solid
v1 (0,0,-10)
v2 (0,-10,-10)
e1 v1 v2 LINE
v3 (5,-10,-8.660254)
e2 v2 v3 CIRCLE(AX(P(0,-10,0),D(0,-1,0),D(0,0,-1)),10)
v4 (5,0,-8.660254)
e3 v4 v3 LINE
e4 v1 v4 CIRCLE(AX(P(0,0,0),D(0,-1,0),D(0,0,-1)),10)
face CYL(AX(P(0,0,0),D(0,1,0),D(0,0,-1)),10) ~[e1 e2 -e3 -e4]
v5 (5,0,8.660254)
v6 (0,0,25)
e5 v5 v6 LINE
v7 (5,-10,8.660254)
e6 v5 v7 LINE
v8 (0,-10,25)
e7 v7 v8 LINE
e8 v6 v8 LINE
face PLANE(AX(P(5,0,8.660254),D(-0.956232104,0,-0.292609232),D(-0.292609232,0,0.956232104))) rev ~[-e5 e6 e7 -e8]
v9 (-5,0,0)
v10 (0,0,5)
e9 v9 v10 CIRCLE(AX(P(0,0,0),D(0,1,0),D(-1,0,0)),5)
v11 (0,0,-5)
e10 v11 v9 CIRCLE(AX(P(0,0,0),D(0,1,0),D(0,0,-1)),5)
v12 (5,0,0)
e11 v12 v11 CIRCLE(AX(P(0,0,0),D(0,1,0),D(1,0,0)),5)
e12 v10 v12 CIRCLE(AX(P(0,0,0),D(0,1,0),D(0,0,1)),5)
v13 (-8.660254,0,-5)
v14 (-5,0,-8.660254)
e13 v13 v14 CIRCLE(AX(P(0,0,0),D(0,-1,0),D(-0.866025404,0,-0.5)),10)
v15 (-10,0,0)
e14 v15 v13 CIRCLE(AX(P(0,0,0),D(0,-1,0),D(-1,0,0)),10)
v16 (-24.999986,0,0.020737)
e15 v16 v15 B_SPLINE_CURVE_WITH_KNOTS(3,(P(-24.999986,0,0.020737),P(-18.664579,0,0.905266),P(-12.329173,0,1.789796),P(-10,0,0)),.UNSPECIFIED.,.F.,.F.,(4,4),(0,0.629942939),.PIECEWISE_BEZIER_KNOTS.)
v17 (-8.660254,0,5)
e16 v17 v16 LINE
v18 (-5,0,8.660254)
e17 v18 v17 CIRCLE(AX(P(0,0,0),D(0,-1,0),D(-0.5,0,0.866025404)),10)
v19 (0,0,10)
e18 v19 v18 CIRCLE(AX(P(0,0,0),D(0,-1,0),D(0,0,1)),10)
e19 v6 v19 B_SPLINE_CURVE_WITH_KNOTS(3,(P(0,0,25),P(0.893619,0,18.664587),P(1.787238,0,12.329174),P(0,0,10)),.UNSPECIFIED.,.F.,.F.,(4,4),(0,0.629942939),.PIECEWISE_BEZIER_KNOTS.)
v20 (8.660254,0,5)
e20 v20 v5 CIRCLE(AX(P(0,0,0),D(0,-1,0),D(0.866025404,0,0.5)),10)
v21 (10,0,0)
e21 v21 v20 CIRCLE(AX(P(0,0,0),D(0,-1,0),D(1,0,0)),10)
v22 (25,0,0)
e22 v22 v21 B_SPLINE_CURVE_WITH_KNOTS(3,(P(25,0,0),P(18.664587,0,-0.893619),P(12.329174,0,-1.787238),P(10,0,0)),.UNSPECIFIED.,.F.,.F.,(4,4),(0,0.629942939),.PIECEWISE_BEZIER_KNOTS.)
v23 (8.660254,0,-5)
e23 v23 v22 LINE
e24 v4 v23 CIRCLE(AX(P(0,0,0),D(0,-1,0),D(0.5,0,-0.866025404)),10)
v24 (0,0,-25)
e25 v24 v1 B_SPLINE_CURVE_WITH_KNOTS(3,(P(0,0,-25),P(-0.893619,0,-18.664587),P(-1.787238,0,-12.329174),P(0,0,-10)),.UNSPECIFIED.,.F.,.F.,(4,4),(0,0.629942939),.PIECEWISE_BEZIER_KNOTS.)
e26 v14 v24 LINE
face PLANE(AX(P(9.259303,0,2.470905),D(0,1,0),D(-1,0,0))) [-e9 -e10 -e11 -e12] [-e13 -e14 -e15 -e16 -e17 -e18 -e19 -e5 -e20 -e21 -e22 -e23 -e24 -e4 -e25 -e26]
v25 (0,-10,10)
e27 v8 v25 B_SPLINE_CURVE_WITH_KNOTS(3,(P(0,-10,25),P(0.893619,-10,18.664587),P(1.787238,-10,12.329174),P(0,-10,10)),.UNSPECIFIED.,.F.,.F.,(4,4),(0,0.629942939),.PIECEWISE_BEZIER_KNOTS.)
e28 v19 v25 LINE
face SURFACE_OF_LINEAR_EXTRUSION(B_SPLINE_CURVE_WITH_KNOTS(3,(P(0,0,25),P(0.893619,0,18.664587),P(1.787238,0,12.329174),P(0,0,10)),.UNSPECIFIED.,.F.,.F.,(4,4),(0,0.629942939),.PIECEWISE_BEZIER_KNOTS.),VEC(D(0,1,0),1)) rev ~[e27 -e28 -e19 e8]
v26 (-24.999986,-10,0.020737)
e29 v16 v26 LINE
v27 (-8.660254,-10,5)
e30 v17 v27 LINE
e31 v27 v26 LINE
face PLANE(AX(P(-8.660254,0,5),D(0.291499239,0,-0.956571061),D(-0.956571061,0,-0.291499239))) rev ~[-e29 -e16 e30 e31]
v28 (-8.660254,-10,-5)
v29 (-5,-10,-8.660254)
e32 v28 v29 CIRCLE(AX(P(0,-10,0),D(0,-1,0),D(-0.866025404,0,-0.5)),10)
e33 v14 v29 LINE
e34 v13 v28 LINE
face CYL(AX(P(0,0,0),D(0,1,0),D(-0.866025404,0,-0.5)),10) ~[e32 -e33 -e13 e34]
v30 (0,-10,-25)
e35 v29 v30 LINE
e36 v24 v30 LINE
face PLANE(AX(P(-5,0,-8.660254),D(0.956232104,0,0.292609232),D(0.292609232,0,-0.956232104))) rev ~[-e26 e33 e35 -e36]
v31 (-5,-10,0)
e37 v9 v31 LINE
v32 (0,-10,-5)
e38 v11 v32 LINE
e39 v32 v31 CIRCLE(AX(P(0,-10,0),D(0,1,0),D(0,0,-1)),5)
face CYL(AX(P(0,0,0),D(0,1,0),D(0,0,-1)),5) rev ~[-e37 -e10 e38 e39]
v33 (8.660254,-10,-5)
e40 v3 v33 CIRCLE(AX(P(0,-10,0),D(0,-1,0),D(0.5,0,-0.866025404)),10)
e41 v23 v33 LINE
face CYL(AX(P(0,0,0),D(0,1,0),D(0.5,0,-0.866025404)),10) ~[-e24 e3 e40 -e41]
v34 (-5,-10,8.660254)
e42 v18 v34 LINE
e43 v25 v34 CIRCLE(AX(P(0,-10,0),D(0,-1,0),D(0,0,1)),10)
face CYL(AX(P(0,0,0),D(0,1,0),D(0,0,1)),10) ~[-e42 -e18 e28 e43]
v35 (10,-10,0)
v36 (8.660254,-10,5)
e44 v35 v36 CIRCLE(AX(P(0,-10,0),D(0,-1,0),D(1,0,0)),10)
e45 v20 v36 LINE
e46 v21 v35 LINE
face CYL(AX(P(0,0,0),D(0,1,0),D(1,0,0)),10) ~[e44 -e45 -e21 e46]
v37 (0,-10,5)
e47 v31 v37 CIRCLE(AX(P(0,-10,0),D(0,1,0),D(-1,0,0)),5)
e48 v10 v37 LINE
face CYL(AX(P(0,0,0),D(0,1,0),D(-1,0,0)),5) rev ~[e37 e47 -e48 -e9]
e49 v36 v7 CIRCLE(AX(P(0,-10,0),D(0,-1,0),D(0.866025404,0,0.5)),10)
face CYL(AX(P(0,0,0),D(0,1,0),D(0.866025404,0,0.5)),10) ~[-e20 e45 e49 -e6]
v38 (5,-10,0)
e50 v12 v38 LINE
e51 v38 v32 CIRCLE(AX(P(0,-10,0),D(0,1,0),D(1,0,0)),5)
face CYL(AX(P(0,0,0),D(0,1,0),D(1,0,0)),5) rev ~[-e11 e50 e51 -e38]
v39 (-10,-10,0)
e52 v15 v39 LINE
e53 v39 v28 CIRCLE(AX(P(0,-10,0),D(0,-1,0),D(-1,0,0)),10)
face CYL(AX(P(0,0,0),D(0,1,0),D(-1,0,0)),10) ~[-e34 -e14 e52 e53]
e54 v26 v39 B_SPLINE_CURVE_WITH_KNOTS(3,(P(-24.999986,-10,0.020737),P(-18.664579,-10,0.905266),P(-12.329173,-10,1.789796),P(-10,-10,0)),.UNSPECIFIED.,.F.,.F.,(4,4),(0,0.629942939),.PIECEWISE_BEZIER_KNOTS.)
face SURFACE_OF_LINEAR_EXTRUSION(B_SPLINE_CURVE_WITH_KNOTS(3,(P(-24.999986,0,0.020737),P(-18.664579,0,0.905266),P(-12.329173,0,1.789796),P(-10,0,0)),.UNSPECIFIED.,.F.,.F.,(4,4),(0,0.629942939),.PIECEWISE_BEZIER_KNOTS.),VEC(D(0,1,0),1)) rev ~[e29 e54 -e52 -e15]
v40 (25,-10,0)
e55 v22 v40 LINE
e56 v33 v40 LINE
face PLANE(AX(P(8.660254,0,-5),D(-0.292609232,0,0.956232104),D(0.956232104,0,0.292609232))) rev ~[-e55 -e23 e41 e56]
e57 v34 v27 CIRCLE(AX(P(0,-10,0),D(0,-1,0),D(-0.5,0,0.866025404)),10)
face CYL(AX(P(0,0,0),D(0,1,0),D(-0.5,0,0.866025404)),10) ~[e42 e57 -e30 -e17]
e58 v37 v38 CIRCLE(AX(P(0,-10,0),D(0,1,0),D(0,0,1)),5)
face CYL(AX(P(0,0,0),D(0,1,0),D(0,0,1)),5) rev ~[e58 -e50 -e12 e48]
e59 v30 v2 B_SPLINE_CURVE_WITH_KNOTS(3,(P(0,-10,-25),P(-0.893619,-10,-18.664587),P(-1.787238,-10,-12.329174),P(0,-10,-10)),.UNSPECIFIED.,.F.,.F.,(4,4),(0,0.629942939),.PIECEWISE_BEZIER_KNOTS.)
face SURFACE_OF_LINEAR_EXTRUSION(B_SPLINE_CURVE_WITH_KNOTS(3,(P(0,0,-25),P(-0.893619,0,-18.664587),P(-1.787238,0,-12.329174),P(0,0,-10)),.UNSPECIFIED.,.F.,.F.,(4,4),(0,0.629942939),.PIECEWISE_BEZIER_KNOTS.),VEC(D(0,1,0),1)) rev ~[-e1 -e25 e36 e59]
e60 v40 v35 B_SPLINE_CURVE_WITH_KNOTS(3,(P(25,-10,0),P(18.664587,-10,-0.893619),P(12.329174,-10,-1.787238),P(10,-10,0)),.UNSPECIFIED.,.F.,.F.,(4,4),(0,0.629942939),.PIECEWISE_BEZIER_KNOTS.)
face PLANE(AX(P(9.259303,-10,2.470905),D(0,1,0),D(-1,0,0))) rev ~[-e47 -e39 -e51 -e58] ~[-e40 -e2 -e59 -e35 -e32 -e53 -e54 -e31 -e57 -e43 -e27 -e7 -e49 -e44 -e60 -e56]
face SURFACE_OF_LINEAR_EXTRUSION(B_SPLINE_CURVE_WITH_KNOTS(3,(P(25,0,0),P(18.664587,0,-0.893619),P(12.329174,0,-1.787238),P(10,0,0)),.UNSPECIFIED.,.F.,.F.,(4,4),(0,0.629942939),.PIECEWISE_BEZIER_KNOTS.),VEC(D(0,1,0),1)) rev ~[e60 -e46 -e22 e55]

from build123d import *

# Parameters (mm, degrees)
F1_DEPTH = 10


# Not quite as in the source:
# - a feature names something its author has since deleted; it is built from what else it names


with BuildPart() as f1:
    # F0 (on Front) → F1 (new body)
    with BuildSketch(Plane.XZ):
        with BuildLine():
            add(Edge.make_bspline(
                [(10, 0), (8.6317372981, 1.0499048978), (8.645995668, 3.0249524489), (8.6602540378, 5)],
                knots=[0.6299429387, 0.6299429387, 0.6299429387, 0.6299429387, 1, 1, 1, 1], degree=3))
            ThreePointArc((10, 0), (9.6592582629, 2.588190451), (8.6602540378, 5))
        make_face()
        with BuildLine():
            add(Edge.make_bspline(
                [(25, 0), (18.6645871914, -0.8936191818), (12.3291743827, -1.7872383636), (10, 0)],
                knots=[0, 0, 0, 0, 0.6299429387, 0.6299429387, 0.6299429387, 0.6299429387], degree=3))
            ThreePointArc((10, 0), (9.6592582629, -2.588190451), (8.6602540378, -5))
            Line((8.6602540378, -5), (25, 0))
        make_face()
        with BuildLine():
            ThreePointArc((8.6602540378, -5), (9.6592582629, -2.588190451), (10, 0))
            Line((10, 0), (5, 0))
            Line((5, 0), (5, -4.9574967987))
            Line((5, -4.9574967987), (5, -5))
            Line((5, -5), (8.6602540378, -5))
        make_face()
        with BuildLine():
            Line((5, 0), (10, 0))
            add(Edge.make_bspline(
                [(10, 0), (8.6317372981, 1.0499048978), (8.645995668, 3.0249524489), (8.6602540378, 5)],
                knots=[0.6299429387, 0.6299429387, 0.6299429387, 0.6299429387, 1, 1, 1, 1], degree=3))
            Line((8.6602540378, 5), (5, 5))
            Line((5, 5), (5, 0))
        make_face()
        with BuildLine():
            Line((5, 5), (8.6602540378, 5))
            ThreePointArc((8.6602540378, 5), (7.0710678119, 7.0710678119), (5, 8.6602540378))
            Line((5, 8.6602540378), (5, 5))
        make_face()
        with BuildLine():
            ThreePointArc((5, -8.6602540378), (7.0710678119, -7.0710678119), (8.6602540378, -5))
            Line((8.6602540378, -5), (5, -5))
            Line((5, -5), (5, -8.6602540378))
        make_face()
        with BuildLine():
            ThreePointArc((0, 5), (3.5355339059, 3.5355339059), (5, 0))
            Line((5, 0), (5, 5))
            Line((5, 5), (4.9574967987, 5))
            Line((4.9574967987, 5), (0, 5))
        make_face()
        with BuildLine():
            Line((5, -4.9574967987), (5, 0))
            ThreePointArc((5, 0), (3.5355339059, -3.5355339059), (0, -5))
            Line((0, -5), (4.9574967987, -5))
            Line((4.9574967987, -5), (5, -5))
            Line((5, -5), (5, -4.9574967987))
        make_face()
        with BuildLine():
            Line((5, 5), (5, 8.6602540378))
            ThreePointArc((5, 8.6602540378), (2.588190451, 9.6592582629), (0, 10))
            Line((0, 10), (0, 5))
            Line((0, 5), (4.9574967987, 5))
            Line((4.9574967987, 5), (5, 5))
        make_face()
        with BuildLine():
            ThreePointArc((0, 10), (2.588190451, 9.6592582629), (5, 8.6602540378))
            Line((5, 8.6602540378), (0, 25))
            add(Edge.make_bspline(
                [(0, 25), (0.8936191818, 18.6645871914), (1.7872383636, 12.3291743827), (0, 10)],
                knots=[0, 0, 0, 0, 0.6299429387, 0.6299429387, 0.6299429387, 0.6299429387], degree=3))
        make_face()
        with BuildLine():
            add(Edge.make_bspline(
                [(0, -10), (1.0499048978, -8.6317372981), (3.0249524489, -8.645995668), (5, -8.6602540378)],
                knots=[0.6299429387, 0.6299429387, 0.6299429387, 0.6299429387, 1, 1, 1, 1], degree=3))
            Line((5, -8.6602540378), (5, -5))
            Line((5, -5), (4.9574967987, -5))
            Line((4.9574967987, -5), (0, -5))
            Line((0, -5), (0, -10))
        make_face()
        with BuildLine():
            ThreePointArc((0, -10), (2.588190451, -9.6592582629), (5, -8.6602540378))
            add(Edge.make_bspline(
                [(0, -10), (1.0499048978, -8.6317372981), (3.0249524489, -8.645995668), (5, -8.6602540378)],
                knots=[0.6299429387, 0.6299429387, 0.6299429387, 0.6299429387, 1, 1, 1, 1], degree=3))
        make_face()
        with BuildLine():
            Line((-5, 5), (0, 5))
            Line((0, 5), (0, 10))
            add(Edge.make_bspline(
                [(0, 10), (-1.0499048978, 8.6317372981), (-3.0249524489, 8.645995668), (-5, 8.6602540378)],
                knots=[0.6299429387, 0.6299429387, 0.6299429387, 0.6299429387, 1, 1, 1, 1], degree=3))
            Line((-5, 8.6602540378), (-5, 5))
        make_face()
        with BuildLine():
            ThreePointArc((-5, 0), (-3.5355339059, 3.5355339059), (0, 5))
            Line((0, 5), (-5, 5))
            Line((-5, 5), (-5, 0))
        make_face()
        with BuildLine():
            Line((0, -10), (0, -5))
            Line((0, -5), (-5, -5))
            Line((-5, -5), (-5, -8.6602540378))
            ThreePointArc((-5, -8.6602540378), (-2.588190451, -9.6592582629), (0, -10))
        make_face()
        with BuildLine():
            Line((-5, -5), (0, -5))
            ThreePointArc((0, -5), (-3.5355339059, -3.5355339059), (-5, 0))
            Line((-5, 0), (-5, -4.9574967987))
            Line((-5, -4.9574967987), (-5, -5))
        make_face()
        with BuildLine():
            add(Edge.make_bspline(
                [(0, 10), (-1.0499048978, 8.6317372981), (-3.0249524489, 8.645995668), (-5, 8.6602540378)],
                knots=[0.6299429387, 0.6299429387, 0.6299429387, 0.6299429387, 1, 1, 1, 1], degree=3))
            ThreePointArc((0, 10), (-2.588190451, 9.6592582629), (-5, 8.6602540378))
        make_face()
        with BuildLine():
            add(Edge.make_bspline(
                [(0, -25), (-0.8936191818, -18.6645871914), (-1.7872383636, -12.3291743827), (0, -10)],
                knots=[0, 0, 0, 0, 0.6299429387, 0.6299429387, 0.6299429387, 0.6299429387], degree=3))
            ThreePointArc((0, -10), (-2.588190451, -9.6592582629), (-5, -8.6602540378))
            Line((-5, -8.6602540378), (0, -25))
        make_face()
        with BuildLine():
            Line((-5, -4.9574967987), (-5, 0))
            Line((-5, 0), (-10, 0))
            add(Edge.make_bspline(
                [(-10, 0), (-8.6317383367, -1.0514075248), (-8.6459961873, -3.0257037624), (-8.6602540378, -5)],
                knots=[0.6299429387, 0.6299429387, 0.6299429387, 0.6299429387, 1, 1, 1, 1], degree=3))
            Line((-8.6602540378, -5), (-5, -5))
            Line((-5, -5), (-5, -4.9574967987))
        make_face()
        with BuildLine():
            Line((-10, 0), (-5, 0))
            Line((-5, 0), (-5, 5))
            Line((-5, 5), (-8.6602540378, 5))
            ThreePointArc((-8.6602540378, 5), (-9.6592582629, 2.588190451), (-10, 0))
        make_face()
        with BuildLine():
            Line((-8.6602540378, 5), (-5, 5))
            Line((-5, 5), (-5, 8.6602540378))
            ThreePointArc((-5, 8.6602540378), (-7.0710678119, 7.0710678119), (-8.6602540378, 5))
        make_face()
        with BuildLine():
            Line((-5, -8.6602540378), (-5, -5))
            Line((-5, -5), (-8.6602540378, -5))
            ThreePointArc((-8.6602540378, -5), (-7.0710678119, -7.0710678119), (-5, -8.6602540378))
        make_face()
        with BuildLine():
            add(Edge.make_bspline(
                [(-24.9999856665, 0.0207365385), (-18.6645791406, 0.9052664015), (-12.3291726147, 1.7897962644), (-10, 0)],
                knots=[0, 0, 0, 0, 0.6299429387, 0.6299429387, 0.6299429387, 0.6299429387], degree=3))
            ThreePointArc((-10, 0), (-9.6592582629, 2.588190451), (-8.6602540378, 5))
            Line((-8.6602540378, 5), (-24.9999856665, 0.0207365385))
        make_face()
        with BuildLine():
            add(Edge.make_bspline(
                [(-10, 0), (-8.6317383367, -1.0514075248), (-8.6459961873, -3.0257037624), (-8.6602540378, -5)],
                knots=[0.6299429387, 0.6299429387, 0.6299429387, 0.6299429387, 1, 1, 1, 1], degree=3))
            ThreePointArc((-10, 0), (-9.6592582629, -2.588190451), (-8.6602540378, -5))
        make_face()
    extrude(amount=F1_DEPTH)


solid = f1.part
